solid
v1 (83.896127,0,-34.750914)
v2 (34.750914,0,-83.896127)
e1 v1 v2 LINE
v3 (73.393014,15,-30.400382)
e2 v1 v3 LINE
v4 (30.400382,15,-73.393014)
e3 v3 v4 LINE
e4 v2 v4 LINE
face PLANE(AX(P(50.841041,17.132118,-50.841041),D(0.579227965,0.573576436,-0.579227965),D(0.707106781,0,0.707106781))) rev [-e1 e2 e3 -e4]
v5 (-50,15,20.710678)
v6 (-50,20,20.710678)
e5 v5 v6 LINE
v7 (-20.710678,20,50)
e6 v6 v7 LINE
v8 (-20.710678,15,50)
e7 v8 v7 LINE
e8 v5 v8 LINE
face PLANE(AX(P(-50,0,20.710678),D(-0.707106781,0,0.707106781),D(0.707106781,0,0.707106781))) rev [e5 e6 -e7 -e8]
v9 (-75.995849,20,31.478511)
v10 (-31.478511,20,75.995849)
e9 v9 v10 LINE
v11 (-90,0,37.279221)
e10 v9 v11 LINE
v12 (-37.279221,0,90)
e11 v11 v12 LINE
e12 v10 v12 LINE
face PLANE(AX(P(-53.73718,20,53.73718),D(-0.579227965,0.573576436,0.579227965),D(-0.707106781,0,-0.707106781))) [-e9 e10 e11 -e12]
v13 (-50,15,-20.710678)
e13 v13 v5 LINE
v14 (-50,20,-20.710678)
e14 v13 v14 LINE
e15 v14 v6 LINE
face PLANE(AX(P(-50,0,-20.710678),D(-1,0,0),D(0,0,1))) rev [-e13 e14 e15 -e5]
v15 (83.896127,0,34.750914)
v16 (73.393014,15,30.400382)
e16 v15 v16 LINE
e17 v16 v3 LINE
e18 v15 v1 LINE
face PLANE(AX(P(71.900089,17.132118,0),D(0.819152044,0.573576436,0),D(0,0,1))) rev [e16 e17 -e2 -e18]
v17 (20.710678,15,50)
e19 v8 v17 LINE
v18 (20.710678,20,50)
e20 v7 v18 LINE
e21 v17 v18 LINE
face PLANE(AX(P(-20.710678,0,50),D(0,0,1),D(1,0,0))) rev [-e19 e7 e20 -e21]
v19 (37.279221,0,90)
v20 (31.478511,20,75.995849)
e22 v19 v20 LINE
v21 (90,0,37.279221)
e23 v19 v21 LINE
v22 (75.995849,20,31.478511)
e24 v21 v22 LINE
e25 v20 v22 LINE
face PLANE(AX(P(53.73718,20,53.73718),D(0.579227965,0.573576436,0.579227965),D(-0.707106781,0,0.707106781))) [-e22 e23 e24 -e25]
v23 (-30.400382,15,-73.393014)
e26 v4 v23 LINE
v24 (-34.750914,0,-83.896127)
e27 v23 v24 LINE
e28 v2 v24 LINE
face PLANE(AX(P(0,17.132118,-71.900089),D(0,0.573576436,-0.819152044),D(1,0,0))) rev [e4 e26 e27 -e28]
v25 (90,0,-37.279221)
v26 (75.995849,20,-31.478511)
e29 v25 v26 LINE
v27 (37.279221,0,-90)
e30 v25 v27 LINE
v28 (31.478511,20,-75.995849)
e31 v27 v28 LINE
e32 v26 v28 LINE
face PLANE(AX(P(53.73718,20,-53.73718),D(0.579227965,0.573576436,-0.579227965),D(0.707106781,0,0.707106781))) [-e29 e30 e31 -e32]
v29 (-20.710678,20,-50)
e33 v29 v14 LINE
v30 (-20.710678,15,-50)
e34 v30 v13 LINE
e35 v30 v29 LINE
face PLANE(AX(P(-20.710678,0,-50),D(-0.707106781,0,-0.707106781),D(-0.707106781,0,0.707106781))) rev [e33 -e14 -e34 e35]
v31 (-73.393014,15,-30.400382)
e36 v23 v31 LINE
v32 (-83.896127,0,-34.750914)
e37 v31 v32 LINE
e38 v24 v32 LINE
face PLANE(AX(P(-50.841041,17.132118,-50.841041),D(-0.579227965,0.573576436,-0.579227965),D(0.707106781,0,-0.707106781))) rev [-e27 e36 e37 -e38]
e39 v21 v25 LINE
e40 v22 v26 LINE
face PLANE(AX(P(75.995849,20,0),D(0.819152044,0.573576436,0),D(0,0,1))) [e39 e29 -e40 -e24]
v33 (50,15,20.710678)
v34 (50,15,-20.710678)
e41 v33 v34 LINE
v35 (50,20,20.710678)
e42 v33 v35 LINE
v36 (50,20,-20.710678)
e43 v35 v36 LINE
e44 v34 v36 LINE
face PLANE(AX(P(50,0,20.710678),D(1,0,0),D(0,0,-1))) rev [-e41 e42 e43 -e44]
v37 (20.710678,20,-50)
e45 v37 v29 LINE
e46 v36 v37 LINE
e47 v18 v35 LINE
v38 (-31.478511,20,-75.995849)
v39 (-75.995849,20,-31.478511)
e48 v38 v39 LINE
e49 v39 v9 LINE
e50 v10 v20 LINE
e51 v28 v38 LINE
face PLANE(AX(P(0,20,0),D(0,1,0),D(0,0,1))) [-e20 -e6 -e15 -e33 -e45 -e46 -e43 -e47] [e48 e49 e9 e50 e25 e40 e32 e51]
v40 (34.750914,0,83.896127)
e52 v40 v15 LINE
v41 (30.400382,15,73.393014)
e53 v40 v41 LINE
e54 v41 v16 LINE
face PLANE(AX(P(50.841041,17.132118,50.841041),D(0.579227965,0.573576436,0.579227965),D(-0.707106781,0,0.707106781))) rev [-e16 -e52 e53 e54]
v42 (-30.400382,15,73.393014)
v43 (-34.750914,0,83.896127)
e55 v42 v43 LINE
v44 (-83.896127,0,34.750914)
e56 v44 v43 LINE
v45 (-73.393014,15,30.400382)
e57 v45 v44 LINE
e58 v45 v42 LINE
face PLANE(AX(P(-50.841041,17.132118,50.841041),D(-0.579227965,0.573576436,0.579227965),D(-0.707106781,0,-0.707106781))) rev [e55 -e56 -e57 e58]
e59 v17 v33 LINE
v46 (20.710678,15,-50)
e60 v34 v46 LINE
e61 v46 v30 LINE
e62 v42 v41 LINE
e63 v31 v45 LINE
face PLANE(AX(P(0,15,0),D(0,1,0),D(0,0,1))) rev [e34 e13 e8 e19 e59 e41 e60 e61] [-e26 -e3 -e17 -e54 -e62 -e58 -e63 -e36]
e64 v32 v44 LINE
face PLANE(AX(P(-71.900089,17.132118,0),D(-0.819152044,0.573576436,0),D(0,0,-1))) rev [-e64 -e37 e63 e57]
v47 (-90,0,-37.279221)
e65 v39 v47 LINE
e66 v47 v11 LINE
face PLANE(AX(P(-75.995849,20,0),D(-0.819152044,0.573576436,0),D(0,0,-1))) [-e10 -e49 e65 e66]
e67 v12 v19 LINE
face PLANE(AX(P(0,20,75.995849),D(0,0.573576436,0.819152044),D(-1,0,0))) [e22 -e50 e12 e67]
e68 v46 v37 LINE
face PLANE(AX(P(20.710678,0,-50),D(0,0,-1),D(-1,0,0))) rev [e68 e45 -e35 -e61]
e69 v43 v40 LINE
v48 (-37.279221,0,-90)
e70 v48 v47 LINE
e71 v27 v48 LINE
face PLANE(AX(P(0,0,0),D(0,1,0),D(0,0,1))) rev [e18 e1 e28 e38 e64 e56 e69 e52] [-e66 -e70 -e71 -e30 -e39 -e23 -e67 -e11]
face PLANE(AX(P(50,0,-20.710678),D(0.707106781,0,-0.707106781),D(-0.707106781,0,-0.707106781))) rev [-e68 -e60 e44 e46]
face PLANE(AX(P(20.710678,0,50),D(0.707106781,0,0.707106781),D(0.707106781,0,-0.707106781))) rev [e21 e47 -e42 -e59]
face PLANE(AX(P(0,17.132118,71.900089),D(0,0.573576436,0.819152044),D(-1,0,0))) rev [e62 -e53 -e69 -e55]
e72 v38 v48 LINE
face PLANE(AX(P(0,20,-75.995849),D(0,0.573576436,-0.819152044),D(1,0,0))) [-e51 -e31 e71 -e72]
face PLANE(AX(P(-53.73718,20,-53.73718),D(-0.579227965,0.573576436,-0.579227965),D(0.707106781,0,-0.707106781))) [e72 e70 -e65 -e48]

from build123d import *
from OCP.BRepFilletAPI import BRepFilletAPI_MakeChamfer

# Parameters (mm, degrees)
BOSS_EXTRUDE1_DEPTH = 20
CHAMFER1_SIZE       = 20
CHAMFER1_SIZE_2     = 14.004150764
SHELL1_DEPTH        = 15
SHELL1_DRAFT        = 35
CUT_EXTRUDE2_DEPTH  = 129.840987267


# Read off the part's stored shape, not the designer's step: Shell1
with BuildPart() as part:
    # Sketch1 → Boss-Extrude1 (new body)
    with BuildSketch(Plane(origin=(0, 0, 0), x_dir=(1, 0, 0), z_dir=(0, 1, 0))):
        Polygon((90, -37.279220614), (90, 37.279220614), (37.279220614, 90), (-37.279220614, 90), (-90, 37.279220614), (-90, -37.279220614), (-37.279220614, -90), (37.279220614, -90), align=None)
    extrude(amount=BOSS_EXTRUDE1_DEPTH)

    # Chamfer1
    chamfer1_edges_1 = [part.edges().sort_by_distance(p)[0] for p in [
        (0, 20, 90),
    ]]
    chamfer1_side_1 = [part.faces().sort_by_distance(p)[0] for p in [
        (0, 19.719916985, 90),
    ]]
    chamfer1_edges_2 = [part.edges().sort_by_distance(p)[0] for p in [
        (-63.639610307, 20, 63.639610307),
    ]]
    chamfer1_side_2 = [part.faces().sort_by_distance(p)[0] for p in [
        (-63.639610307, 19.719916985, 63.639610307),
    ]]
    chamfer1_edges_3 = [part.edges().sort_by_distance(p)[0] for p in [
        (-90, 20, 0),
    ]]
    chamfer1_side_3 = [part.faces().sort_by_distance(p)[0] for p in [
        (-90, 19.719916985, 0),
    ]]
    chamfer1_edges_4 = [part.edges().sort_by_distance(p)[0] for p in [
        (-63.639610307, 20, -63.639610307),
    ]]
    chamfer1_side_4 = [part.faces().sort_by_distance(p)[0] for p in [
        (-63.639610307, 19.719916985, -63.639610307),
    ]]
    chamfer1_edges_5 = [part.edges().sort_by_distance(p)[0] for p in [
        (0, 20, -90),
    ]]
    chamfer1_side_5 = [part.faces().sort_by_distance(p)[0] for p in [
        (0, 19.719916985, -90),
    ]]
    chamfer1_edges_6 = [part.edges().sort_by_distance(p)[0] for p in [
        (63.639610307, 20, -63.639610307),
    ]]
    chamfer1_side_6 = [part.faces().sort_by_distance(p)[0] for p in [
        (63.639610307, 19.719916985, -63.639610307),
    ]]
    chamfer1_edges_7 = [part.edges().sort_by_distance(p)[0] for p in [
        (90, 20, 0),
    ]]
    chamfer1_side_7 = [part.faces().sort_by_distance(p)[0] for p in [
        (90, 19.719916985, 0),
    ]]
    chamfer1_edges_8 = [part.edges().sort_by_distance(p)[0] for p in [
        (63.639610307, 20, 63.639610307),
    ]]
    chamfer1_side_8 = [part.faces().sort_by_distance(p)[0] for p in [
        (63.639610307, 19.719916985, 63.639610307),
    ]]
    chamfer1 = BRepFilletAPI_MakeChamfer(part.part.solid().wrapped)
    for e in chamfer1_edges_1:
        chamfer1.Add(CHAMFER1_SIZE - 0.0001, CHAMFER1_SIZE_2 - 0.0001, e.wrapped, chamfer1_side_1[0].wrapped)
    for e in chamfer1_edges_2:
        chamfer1.Add(CHAMFER1_SIZE - 0.0001, CHAMFER1_SIZE_2 - 0.0001, e.wrapped, chamfer1_side_2[0].wrapped)
    for e in chamfer1_edges_3:
        chamfer1.Add(CHAMFER1_SIZE - 0.0001, CHAMFER1_SIZE_2 - 0.0001, e.wrapped, chamfer1_side_3[0].wrapped)
    for e in chamfer1_edges_4:
        chamfer1.Add(CHAMFER1_SIZE - 0.0001, CHAMFER1_SIZE_2 - 0.0001, e.wrapped, chamfer1_side_4[0].wrapped)
    for e in chamfer1_edges_5:
        chamfer1.Add(CHAMFER1_SIZE - 0.0001, CHAMFER1_SIZE_2 - 0.0001, e.wrapped, chamfer1_side_5[0].wrapped)
    for e in chamfer1_edges_6:
        chamfer1.Add(CHAMFER1_SIZE - 0.0001, CHAMFER1_SIZE_2 - 0.0001, e.wrapped, chamfer1_side_6[0].wrapped)
    for e in chamfer1_edges_7:
        chamfer1.Add(CHAMFER1_SIZE - 0.0001, CHAMFER1_SIZE_2 - 0.0001, e.wrapped, chamfer1_side_7[0].wrapped)
    for e in chamfer1_edges_8:
        chamfer1.Add(CHAMFER1_SIZE - 0.0001, CHAMFER1_SIZE_2 - 0.0001, e.wrapped, chamfer1_side_8[0].wrapped)
    add(Compound.cast(chamfer1.Shape()), mode=Mode.REPLACE)  # a hair under: the kernel refuses the full size


with BuildPart() as shell1_tool:
    # Shell1 outline → Shell1 (with draft: the straight prism first)
    with BuildSketch(Plane(origin=(0, 15, 0), x_dir=(1, 0, 0), z_dir=(0, 1, 0))):
        Polygon((-30.400381775, -73.393013983), (30.400381775, -73.393013983), (73.393013983, -30.400381775), (73.393013983, 30.400381775), (30.400381775, 73.393013983), (-30.400381775, 73.393013983), (-73.393013983, 30.400381775), (-73.393013983, -30.400381775), align=None)
    extrude(amount=-SHELL1_DEPTH)
    # Shell1: the draft: its side faces are tilted about the plane it starts from
    shell1_sides = [shell1_tool.faces().sort_by_distance(p)[0] for p in [
        (0, 7.5, 73.393013983),
        (51.896697879, 7.5, 51.896697879),
        (73.393013983, 7.5, 0),
        (51.896697879, 7.5, -51.896697879),
        (0, 7.5, -73.393013983),
        (-51.896697879, 7.5, -51.896697879),
        (-73.393013983, 7.5, 0),
        (-51.896697879, 7.5, 51.896697879),
    ]]
    draft(shell1_sides, Plane(origin=(0, 15, 0), x_dir=(1, 0, 0), z_dir=(0, 1, 0)), SHELL1_DRAFT)


with BuildPart() as part_1:
    add(part.part)

    # Shell1: cut by shell1_tool
    add(shell1_tool.part, mode=Mode.SUBTRACT)

    # Sketch2 → Cut-Extrude2 (cut, through all)
    with BuildSketch(Plane(origin=(0, 20, 0), x_dir=(1, 0, 0), z_dir=(0, 1, 0))):
        Polygon((20.710678119, 50), (-20.710678119, 50), (-50, 20.710678119), (-50, -20.710678119), (-20.710678119, -50), (20.710678119, -50), (50, -20.710678119), (50, 20.710678119), align=None)
    extrude(amount=-CUT_EXTRUDE2_DEPTH, mode=Mode.SUBTRACT)


solid = part_1.part
